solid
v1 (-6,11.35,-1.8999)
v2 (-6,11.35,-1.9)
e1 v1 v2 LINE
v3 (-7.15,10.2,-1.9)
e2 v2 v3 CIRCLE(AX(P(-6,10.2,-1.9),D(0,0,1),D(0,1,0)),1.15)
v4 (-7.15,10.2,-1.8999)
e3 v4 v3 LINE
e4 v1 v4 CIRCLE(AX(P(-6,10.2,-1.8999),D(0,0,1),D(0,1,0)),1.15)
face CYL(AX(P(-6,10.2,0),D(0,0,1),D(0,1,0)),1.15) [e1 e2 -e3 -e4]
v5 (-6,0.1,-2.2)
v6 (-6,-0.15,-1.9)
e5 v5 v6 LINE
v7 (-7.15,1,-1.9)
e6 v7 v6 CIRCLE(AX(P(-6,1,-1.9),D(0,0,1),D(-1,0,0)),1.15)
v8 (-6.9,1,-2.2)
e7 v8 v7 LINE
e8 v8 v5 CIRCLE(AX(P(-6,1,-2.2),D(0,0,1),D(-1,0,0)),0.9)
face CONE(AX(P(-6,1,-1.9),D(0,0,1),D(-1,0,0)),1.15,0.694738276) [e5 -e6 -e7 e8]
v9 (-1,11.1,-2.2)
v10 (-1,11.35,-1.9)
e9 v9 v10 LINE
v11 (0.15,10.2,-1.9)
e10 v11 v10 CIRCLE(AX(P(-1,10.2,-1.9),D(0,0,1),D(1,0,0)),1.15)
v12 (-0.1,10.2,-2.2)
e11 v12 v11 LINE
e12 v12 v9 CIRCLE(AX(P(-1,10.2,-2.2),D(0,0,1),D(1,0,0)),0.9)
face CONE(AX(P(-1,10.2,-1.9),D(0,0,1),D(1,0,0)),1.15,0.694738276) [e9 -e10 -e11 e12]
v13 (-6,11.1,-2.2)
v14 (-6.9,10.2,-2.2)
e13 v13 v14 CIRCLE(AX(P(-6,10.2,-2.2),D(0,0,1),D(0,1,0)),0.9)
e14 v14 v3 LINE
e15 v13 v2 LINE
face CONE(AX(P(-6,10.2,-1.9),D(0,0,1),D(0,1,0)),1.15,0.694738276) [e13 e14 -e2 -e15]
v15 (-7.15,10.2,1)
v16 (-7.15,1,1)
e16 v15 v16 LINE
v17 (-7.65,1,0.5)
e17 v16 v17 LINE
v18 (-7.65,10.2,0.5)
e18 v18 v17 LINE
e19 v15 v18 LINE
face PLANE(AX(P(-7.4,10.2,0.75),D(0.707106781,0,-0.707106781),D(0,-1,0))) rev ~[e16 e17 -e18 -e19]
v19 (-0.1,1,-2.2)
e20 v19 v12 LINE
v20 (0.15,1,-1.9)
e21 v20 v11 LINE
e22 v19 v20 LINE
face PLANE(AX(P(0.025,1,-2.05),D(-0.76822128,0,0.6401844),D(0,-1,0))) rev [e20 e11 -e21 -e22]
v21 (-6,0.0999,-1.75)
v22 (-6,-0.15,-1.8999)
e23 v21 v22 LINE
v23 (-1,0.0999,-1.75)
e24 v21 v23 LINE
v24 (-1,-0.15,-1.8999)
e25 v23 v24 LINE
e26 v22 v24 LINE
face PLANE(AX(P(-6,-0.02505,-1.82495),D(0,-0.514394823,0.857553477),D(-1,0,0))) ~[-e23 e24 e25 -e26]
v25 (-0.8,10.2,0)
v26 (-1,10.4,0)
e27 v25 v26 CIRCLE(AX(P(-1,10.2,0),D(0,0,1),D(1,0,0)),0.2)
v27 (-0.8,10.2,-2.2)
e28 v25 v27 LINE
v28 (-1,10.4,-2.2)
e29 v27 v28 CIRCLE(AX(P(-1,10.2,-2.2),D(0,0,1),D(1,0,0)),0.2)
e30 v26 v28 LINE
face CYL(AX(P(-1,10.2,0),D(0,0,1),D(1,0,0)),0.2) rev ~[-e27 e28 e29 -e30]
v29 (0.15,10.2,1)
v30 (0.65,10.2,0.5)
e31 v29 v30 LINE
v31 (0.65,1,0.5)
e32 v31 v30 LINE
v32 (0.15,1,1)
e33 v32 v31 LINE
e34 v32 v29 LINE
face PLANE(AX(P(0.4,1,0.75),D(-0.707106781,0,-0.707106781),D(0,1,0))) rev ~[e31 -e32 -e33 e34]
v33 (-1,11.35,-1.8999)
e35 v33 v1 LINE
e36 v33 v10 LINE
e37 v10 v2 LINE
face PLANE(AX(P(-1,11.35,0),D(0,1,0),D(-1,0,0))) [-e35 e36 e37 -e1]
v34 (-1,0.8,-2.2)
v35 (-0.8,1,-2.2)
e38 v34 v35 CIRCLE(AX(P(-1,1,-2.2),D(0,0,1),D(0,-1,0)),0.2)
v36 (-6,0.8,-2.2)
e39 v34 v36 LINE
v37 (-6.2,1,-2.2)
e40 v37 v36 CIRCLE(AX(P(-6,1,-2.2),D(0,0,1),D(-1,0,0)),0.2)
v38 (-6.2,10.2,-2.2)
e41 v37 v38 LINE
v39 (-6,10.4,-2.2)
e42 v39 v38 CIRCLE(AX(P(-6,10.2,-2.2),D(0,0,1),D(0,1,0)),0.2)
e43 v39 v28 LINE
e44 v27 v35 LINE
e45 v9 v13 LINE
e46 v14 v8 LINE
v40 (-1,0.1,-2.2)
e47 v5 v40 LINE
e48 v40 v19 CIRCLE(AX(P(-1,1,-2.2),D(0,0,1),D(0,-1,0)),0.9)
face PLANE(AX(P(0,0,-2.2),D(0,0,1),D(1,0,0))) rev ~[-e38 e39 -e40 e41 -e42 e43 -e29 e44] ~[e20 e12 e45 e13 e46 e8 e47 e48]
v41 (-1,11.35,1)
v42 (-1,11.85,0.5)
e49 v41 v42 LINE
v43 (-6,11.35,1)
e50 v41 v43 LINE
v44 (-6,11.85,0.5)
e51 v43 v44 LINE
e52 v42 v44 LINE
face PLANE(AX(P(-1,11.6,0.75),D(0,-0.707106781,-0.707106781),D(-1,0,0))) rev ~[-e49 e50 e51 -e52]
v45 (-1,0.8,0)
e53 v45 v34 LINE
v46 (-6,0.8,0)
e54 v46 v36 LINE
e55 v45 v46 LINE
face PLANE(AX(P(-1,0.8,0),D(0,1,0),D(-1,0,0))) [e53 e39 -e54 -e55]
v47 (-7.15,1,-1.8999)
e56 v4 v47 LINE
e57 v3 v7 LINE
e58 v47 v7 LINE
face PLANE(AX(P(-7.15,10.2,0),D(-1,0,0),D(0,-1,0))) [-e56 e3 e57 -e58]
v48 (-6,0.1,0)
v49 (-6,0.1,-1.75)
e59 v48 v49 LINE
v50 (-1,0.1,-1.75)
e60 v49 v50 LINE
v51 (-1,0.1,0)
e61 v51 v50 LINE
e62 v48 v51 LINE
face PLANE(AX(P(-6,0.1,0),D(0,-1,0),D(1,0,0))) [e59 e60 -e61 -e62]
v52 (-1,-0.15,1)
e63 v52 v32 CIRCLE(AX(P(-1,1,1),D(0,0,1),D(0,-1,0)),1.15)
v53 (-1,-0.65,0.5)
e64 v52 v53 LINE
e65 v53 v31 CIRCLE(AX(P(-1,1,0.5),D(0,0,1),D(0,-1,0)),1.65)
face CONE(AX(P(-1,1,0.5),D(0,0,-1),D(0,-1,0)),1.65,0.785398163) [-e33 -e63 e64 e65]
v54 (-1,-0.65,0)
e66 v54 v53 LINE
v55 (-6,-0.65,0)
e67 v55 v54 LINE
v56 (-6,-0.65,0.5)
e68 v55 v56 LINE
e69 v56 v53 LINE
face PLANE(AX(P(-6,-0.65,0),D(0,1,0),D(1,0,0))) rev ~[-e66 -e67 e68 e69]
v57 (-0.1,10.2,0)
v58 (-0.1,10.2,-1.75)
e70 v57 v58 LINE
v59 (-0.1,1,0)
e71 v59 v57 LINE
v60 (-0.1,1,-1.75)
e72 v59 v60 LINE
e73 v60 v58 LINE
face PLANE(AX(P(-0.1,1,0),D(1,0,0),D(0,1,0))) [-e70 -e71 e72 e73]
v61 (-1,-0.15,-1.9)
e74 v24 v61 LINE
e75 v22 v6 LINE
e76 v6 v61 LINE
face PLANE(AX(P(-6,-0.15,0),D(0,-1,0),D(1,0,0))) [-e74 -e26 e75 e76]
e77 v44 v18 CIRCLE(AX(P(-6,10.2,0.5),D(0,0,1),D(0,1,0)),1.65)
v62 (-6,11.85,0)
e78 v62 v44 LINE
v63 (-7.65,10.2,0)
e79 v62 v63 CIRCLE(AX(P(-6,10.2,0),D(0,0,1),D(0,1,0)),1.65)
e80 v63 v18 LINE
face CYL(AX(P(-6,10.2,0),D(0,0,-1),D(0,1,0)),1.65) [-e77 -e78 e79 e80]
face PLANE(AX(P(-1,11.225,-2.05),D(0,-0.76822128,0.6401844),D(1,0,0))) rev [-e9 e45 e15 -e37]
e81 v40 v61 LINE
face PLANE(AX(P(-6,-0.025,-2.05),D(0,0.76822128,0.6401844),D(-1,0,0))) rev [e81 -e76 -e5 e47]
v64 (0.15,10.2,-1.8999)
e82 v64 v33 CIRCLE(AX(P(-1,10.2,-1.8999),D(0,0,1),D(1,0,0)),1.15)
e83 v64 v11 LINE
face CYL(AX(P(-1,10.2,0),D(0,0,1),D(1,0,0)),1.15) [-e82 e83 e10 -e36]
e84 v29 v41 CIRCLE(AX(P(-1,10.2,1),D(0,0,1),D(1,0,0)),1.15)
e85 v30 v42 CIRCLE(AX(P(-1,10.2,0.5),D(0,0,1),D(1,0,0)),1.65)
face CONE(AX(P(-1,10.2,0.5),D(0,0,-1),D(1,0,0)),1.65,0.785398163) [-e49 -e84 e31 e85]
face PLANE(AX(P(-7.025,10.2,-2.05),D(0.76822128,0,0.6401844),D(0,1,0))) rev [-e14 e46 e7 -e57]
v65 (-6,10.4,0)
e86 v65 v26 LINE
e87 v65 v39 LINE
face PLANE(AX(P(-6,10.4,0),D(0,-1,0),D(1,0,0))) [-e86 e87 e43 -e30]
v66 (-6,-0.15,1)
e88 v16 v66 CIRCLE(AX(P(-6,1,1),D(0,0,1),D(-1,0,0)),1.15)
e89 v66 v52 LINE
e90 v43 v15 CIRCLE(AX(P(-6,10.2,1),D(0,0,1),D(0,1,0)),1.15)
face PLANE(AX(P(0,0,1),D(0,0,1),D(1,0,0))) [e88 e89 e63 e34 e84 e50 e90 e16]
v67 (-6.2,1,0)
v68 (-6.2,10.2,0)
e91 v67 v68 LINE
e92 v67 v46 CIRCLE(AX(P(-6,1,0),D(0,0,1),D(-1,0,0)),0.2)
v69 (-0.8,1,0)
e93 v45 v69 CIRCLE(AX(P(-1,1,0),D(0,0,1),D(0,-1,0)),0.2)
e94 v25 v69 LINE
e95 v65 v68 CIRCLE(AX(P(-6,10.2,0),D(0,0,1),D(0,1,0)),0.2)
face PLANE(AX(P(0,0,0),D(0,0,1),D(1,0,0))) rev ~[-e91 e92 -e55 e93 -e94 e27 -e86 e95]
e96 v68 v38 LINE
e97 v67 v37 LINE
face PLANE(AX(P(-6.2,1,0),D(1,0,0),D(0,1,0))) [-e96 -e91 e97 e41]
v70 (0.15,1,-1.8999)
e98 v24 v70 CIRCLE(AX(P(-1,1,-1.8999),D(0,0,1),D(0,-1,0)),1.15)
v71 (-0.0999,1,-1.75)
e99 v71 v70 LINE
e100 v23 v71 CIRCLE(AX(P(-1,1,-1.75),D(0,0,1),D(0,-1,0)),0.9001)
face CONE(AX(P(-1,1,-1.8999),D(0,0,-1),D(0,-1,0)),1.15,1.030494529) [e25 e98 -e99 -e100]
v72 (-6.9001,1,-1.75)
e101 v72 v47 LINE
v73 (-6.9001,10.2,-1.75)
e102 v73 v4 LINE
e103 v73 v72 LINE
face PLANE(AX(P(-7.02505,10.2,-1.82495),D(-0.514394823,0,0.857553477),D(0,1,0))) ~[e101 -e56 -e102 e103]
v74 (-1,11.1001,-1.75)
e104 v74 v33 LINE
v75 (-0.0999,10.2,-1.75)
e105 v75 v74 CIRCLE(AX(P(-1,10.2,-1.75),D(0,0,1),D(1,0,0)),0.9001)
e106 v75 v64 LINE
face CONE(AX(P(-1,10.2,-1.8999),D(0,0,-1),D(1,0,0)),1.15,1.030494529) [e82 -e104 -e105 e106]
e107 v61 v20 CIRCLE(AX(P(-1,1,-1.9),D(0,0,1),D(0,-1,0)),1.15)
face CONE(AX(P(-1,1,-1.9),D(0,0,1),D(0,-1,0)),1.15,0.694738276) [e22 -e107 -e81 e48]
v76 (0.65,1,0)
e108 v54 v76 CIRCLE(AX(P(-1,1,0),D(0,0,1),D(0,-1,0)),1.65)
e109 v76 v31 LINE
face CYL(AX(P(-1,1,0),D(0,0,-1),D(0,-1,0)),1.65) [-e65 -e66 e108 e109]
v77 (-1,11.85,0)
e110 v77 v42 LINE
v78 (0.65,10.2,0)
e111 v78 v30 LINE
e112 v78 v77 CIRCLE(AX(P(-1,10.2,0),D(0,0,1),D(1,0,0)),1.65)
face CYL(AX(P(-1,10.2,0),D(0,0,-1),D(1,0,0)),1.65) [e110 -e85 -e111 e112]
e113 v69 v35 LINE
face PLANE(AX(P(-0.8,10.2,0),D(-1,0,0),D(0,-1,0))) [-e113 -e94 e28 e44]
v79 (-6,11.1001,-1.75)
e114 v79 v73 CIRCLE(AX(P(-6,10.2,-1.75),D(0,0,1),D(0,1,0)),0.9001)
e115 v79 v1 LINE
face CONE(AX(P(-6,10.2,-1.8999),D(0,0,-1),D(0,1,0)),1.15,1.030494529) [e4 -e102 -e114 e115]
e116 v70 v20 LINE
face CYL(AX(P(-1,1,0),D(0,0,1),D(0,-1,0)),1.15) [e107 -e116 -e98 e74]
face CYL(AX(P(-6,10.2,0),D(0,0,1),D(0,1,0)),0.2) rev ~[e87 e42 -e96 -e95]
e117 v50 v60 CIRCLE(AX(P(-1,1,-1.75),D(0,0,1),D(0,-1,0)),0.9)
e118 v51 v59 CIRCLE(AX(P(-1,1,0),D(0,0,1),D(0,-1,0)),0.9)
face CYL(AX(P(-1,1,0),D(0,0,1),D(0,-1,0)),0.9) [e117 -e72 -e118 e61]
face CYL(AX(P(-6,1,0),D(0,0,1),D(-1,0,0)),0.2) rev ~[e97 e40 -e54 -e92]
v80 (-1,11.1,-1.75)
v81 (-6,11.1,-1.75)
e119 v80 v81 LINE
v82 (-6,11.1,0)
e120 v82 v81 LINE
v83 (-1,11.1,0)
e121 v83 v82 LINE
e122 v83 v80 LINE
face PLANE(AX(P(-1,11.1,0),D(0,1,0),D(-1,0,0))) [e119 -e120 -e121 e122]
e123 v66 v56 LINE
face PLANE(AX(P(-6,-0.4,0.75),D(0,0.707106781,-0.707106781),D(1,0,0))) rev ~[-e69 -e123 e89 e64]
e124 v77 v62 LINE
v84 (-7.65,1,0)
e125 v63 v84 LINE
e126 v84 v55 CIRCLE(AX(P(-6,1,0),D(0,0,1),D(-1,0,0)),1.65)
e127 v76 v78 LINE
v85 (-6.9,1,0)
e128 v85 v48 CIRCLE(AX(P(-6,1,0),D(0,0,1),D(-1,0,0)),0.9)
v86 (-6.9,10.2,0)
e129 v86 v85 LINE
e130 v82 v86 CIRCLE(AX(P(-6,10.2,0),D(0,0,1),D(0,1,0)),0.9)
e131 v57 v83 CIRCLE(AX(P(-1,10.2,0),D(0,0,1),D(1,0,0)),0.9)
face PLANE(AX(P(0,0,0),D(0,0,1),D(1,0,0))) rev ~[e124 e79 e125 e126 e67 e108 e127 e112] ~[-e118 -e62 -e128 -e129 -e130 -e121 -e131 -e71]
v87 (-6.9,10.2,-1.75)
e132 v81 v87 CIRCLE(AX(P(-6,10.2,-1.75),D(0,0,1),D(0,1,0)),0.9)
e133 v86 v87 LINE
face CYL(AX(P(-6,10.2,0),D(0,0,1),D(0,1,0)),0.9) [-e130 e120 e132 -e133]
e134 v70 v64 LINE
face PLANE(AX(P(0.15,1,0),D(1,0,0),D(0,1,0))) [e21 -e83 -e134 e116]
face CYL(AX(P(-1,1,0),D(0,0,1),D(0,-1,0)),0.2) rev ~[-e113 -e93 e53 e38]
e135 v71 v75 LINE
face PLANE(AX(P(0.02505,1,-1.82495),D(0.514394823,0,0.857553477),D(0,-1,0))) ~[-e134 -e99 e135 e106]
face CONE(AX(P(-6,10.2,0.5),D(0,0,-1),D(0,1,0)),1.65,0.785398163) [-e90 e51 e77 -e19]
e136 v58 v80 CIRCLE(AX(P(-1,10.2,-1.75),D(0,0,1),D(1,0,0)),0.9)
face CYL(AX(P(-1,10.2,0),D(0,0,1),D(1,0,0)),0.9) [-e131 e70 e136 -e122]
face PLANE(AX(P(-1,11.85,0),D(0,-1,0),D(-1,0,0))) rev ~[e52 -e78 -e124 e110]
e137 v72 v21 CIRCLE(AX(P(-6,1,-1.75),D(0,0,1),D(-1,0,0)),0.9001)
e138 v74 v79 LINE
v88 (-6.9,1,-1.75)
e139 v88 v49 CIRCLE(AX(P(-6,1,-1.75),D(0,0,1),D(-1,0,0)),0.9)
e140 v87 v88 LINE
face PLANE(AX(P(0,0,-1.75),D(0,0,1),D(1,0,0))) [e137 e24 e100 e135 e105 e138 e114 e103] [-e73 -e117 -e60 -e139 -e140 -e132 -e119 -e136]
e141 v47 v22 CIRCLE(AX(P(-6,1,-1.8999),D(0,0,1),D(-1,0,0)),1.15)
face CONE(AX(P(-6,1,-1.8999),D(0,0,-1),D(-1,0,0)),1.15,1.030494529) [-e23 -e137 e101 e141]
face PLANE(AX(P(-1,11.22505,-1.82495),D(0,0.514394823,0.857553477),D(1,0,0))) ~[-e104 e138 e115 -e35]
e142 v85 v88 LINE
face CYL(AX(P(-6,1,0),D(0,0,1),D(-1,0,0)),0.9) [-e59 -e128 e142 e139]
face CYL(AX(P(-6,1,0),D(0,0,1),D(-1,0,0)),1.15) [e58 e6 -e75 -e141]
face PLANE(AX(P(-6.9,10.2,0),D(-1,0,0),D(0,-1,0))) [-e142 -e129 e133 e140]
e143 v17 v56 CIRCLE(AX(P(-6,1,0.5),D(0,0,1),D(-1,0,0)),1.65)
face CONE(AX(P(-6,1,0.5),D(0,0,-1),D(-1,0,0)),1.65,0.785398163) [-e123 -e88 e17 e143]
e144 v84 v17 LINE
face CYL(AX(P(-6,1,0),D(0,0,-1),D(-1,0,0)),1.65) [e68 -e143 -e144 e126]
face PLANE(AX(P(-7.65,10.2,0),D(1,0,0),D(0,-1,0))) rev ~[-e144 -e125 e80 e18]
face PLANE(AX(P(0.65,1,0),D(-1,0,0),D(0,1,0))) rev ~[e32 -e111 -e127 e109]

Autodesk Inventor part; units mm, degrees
ref_plane "YZ Plane" through (0, 0, 0) normal (1, 0, 0) x (0, 1, 0)
ref_plane "XZ Plane" through (0, 0, 0) normal (0, 1, 0) x (-1, 0, 0)
ref_plane "XY Plane" through (0, 0, 0) normal (0, 0, 1) x (1, 0, 0)
sketch "Sketch1" plane through (0, 0, 0) normal (0, 0, 1) x (1, 0, 0)
  line L0 (-1, 0) -> (-6, 0)
  line L1 (-7, 1) -> (-7, 10.2)
  line L2 (-6, 11.2) -> (-1, 11.2)
  line L3 (0, 10.2) -> (0, 1)
  arc A0 (-7, 1) -> (-6, 0) centre (-6, 1) ccw
  arc A1 (-6, 11.2) -> (-7, 10.2) centre (-6, 10.2) ccw
  arc A2 (0, 10.2) -> (-1, 11.2) centre (-1, 10.2) ccw
  arc A3 (-1, 0) -> (0, 1) centre (-1, 1) ccw
  line L4 (-7.65, 10.2) -> (-7.65, 1)
  arc A4 (-7.65, 1) -> (-6, -0.65) centre (-6, 1) ccw
  line L5 (-6, -0.65) -> (-1, -0.65)
  arc A5 (-1, -0.65) -> (0.65, 1) centre (-1, 1) ccw
  line L6 (0.65, 1) -> (0.65, 10.2)
  arc A6 (0.65, 10.2) -> (-1, 11.85) centre (-1, 10.2) ccw
  line L7 (-1, 11.85) -> (-6, 11.85)
  arc A7 (-6, 11.85) -> (-7.65, 10.2) centre (-6, 10.2) ccw
  line L8 (-6.9, 10.2) -> (-6.9, 1)
  arc A8 (-6.9, 1) -> (-6, 0.1) centre (-6, 1) ccw
  line L9 (-6, 0.1) -> (-1, 0.1)
  arc A9 (-1, 0.1) -> (-0.1, 1) centre (-1, 1) ccw
  line L10 (-0.1, 1) -> (-0.1, 10.2)
  arc A10 (-0.1, 10.2) -> (-1, 11.1) centre (-1, 10.2) ccw
  line L11 (-1, 11.1) -> (-6, 11.1)
  arc A11 (-6, 11.1) -> (-6.9, 10.2) centre (-6, 10.2) ccw
  line L12 (-6.2, 1) -> (-6.2, 10.2)
  arc A12 (-6, 10.4) -> (-6.2, 10.2) centre (-6, 10.2) ccw
  line L13 (-6, 10.4) -> (-1, 10.4)
  arc A13 (-0.8, 10.2) -> (-1, 10.4) centre (-1, 10.2) ccw
  line L14 (-0.8, 10.2) -> (-0.8, 1)
  arc A14 (-1, 0.8) -> (-0.8, 1) centre (-1, 1) ccw
  line L15 (-1, 0.8) -> (-6, 0.8)
  arc A15 (-6.2, 1) -> (-6, 0.8) centre (-6, 1) ccw
  line L16 (-7.15, 10.2) -> (-7.15, 1)
  arc A16 (-7.15, 1) -> (-6, -0.15) centre (-6, 1) ccw
  line L17 (-6, -0.15) -> (-1, -0.15)
  arc A17 (-1, -0.15) -> (0.15, 1) centre (-1, 1) ccw
  line L18 (0.15, 1) -> (0.15, 10.2)
  arc A18 (0.15, 10.2) -> (-1, 11.35) centre (-1, 10.2) ccw
  line L19 (-1, 11.35) -> (-6, 11.35)
  arc A19 (-6, 11.35) -> (-7.15, 10.2) centre (-6, 10.2) ccw
  point P0 (0, 0)
  point P1 (-7, 11.2)
  point P2 (-7, 0)
  point P3 (0, 11.2)
  dimension "d0" = 7
  dimension "d1" = 11.2
  dimension "d2" = 1
  dimension "d3" = 0.65
  dimension "d6" = 0.1
  dimension "d9" = 0.7
  dimension "d10" = 0.15
extrude "Extrusion1" add sketch "Sketch1" along normal blind 1 contours L0 A0 L1 A1 L2 A2 L3 A3 | A7 L7 A6 L6 A5 L5 A4 L4 | A11 L11 A10 L10 A9 L9 A8 L8 | L12 A12 L13 A13 L14 A14 L15 A15 | A19 L19 A18 L18 A17 L17 A16 L16
extrude "Extrusion2" add sketch "Sketch1" against normal blind 2.2 contours L0 A0 L1 A1 L2 A2 L3 A3 | A11 L11 A10 L10 A9 L9 A8 L8 | A19 L19 A18 L18 A17 L17 A16 L16
extrude "Extrusion3" cut sketch "Sketch1" against normal blind 1.75 contours L0 A0 L1 A1 L2 A2 L3 A3 | A19 L19 A18 L18 A17 L17 A16 L16
chamfer "Chamfer1" distance 0.25 distance2 0.15 8 edges at (-6.8132, 11.0132, -1.75) (-3.5, 11.35, -1.75) (-0.1868, 11.0132, -1.75) (0.15, 5.6, -1.75) (-0.1868, 0.1868, -1.75) (-3.5, -0.15, -1.75) (-6.8132, 0.1868, -1.75) (-7.15, 5.6, -1.75) measured on face at (-0.0167, 7.1333, -1.75)
chamfer "Chamfer2" distance 0.5 distance2 0.5 8 edges at (-7.65, 5.6, 1) (-7.1667, -0.1667, 1) (-3.5, -0.65, 1) (0.1667, -0.1667, 1) (0.65, 5.6, 1) (0.1667, 11.3667, 1) (-3.5, 11.85, 1) (-7.1667, 11.3667, 1) measured on face at (-2.1167, 4.0667, 1)
chamfer "Chamfer3" distance 0.25 distance2 0.3 8 edges at (-7.15, 5.6, -2.2) (-6.8132, 11.0132, -2.2) (-3.5, 11.35, -2.2) (-0.1868, 11.0132, -2.2) (0.15, 5.6, -2.2) (-0.1868, 0.1868, -2.2) (-3.5, -0.15, -2.2) (-6.8132, 0.1868, -2.2) measured on face at (-0.1667, 4.0667, -2.2)
properties part number "LilypadCover"
